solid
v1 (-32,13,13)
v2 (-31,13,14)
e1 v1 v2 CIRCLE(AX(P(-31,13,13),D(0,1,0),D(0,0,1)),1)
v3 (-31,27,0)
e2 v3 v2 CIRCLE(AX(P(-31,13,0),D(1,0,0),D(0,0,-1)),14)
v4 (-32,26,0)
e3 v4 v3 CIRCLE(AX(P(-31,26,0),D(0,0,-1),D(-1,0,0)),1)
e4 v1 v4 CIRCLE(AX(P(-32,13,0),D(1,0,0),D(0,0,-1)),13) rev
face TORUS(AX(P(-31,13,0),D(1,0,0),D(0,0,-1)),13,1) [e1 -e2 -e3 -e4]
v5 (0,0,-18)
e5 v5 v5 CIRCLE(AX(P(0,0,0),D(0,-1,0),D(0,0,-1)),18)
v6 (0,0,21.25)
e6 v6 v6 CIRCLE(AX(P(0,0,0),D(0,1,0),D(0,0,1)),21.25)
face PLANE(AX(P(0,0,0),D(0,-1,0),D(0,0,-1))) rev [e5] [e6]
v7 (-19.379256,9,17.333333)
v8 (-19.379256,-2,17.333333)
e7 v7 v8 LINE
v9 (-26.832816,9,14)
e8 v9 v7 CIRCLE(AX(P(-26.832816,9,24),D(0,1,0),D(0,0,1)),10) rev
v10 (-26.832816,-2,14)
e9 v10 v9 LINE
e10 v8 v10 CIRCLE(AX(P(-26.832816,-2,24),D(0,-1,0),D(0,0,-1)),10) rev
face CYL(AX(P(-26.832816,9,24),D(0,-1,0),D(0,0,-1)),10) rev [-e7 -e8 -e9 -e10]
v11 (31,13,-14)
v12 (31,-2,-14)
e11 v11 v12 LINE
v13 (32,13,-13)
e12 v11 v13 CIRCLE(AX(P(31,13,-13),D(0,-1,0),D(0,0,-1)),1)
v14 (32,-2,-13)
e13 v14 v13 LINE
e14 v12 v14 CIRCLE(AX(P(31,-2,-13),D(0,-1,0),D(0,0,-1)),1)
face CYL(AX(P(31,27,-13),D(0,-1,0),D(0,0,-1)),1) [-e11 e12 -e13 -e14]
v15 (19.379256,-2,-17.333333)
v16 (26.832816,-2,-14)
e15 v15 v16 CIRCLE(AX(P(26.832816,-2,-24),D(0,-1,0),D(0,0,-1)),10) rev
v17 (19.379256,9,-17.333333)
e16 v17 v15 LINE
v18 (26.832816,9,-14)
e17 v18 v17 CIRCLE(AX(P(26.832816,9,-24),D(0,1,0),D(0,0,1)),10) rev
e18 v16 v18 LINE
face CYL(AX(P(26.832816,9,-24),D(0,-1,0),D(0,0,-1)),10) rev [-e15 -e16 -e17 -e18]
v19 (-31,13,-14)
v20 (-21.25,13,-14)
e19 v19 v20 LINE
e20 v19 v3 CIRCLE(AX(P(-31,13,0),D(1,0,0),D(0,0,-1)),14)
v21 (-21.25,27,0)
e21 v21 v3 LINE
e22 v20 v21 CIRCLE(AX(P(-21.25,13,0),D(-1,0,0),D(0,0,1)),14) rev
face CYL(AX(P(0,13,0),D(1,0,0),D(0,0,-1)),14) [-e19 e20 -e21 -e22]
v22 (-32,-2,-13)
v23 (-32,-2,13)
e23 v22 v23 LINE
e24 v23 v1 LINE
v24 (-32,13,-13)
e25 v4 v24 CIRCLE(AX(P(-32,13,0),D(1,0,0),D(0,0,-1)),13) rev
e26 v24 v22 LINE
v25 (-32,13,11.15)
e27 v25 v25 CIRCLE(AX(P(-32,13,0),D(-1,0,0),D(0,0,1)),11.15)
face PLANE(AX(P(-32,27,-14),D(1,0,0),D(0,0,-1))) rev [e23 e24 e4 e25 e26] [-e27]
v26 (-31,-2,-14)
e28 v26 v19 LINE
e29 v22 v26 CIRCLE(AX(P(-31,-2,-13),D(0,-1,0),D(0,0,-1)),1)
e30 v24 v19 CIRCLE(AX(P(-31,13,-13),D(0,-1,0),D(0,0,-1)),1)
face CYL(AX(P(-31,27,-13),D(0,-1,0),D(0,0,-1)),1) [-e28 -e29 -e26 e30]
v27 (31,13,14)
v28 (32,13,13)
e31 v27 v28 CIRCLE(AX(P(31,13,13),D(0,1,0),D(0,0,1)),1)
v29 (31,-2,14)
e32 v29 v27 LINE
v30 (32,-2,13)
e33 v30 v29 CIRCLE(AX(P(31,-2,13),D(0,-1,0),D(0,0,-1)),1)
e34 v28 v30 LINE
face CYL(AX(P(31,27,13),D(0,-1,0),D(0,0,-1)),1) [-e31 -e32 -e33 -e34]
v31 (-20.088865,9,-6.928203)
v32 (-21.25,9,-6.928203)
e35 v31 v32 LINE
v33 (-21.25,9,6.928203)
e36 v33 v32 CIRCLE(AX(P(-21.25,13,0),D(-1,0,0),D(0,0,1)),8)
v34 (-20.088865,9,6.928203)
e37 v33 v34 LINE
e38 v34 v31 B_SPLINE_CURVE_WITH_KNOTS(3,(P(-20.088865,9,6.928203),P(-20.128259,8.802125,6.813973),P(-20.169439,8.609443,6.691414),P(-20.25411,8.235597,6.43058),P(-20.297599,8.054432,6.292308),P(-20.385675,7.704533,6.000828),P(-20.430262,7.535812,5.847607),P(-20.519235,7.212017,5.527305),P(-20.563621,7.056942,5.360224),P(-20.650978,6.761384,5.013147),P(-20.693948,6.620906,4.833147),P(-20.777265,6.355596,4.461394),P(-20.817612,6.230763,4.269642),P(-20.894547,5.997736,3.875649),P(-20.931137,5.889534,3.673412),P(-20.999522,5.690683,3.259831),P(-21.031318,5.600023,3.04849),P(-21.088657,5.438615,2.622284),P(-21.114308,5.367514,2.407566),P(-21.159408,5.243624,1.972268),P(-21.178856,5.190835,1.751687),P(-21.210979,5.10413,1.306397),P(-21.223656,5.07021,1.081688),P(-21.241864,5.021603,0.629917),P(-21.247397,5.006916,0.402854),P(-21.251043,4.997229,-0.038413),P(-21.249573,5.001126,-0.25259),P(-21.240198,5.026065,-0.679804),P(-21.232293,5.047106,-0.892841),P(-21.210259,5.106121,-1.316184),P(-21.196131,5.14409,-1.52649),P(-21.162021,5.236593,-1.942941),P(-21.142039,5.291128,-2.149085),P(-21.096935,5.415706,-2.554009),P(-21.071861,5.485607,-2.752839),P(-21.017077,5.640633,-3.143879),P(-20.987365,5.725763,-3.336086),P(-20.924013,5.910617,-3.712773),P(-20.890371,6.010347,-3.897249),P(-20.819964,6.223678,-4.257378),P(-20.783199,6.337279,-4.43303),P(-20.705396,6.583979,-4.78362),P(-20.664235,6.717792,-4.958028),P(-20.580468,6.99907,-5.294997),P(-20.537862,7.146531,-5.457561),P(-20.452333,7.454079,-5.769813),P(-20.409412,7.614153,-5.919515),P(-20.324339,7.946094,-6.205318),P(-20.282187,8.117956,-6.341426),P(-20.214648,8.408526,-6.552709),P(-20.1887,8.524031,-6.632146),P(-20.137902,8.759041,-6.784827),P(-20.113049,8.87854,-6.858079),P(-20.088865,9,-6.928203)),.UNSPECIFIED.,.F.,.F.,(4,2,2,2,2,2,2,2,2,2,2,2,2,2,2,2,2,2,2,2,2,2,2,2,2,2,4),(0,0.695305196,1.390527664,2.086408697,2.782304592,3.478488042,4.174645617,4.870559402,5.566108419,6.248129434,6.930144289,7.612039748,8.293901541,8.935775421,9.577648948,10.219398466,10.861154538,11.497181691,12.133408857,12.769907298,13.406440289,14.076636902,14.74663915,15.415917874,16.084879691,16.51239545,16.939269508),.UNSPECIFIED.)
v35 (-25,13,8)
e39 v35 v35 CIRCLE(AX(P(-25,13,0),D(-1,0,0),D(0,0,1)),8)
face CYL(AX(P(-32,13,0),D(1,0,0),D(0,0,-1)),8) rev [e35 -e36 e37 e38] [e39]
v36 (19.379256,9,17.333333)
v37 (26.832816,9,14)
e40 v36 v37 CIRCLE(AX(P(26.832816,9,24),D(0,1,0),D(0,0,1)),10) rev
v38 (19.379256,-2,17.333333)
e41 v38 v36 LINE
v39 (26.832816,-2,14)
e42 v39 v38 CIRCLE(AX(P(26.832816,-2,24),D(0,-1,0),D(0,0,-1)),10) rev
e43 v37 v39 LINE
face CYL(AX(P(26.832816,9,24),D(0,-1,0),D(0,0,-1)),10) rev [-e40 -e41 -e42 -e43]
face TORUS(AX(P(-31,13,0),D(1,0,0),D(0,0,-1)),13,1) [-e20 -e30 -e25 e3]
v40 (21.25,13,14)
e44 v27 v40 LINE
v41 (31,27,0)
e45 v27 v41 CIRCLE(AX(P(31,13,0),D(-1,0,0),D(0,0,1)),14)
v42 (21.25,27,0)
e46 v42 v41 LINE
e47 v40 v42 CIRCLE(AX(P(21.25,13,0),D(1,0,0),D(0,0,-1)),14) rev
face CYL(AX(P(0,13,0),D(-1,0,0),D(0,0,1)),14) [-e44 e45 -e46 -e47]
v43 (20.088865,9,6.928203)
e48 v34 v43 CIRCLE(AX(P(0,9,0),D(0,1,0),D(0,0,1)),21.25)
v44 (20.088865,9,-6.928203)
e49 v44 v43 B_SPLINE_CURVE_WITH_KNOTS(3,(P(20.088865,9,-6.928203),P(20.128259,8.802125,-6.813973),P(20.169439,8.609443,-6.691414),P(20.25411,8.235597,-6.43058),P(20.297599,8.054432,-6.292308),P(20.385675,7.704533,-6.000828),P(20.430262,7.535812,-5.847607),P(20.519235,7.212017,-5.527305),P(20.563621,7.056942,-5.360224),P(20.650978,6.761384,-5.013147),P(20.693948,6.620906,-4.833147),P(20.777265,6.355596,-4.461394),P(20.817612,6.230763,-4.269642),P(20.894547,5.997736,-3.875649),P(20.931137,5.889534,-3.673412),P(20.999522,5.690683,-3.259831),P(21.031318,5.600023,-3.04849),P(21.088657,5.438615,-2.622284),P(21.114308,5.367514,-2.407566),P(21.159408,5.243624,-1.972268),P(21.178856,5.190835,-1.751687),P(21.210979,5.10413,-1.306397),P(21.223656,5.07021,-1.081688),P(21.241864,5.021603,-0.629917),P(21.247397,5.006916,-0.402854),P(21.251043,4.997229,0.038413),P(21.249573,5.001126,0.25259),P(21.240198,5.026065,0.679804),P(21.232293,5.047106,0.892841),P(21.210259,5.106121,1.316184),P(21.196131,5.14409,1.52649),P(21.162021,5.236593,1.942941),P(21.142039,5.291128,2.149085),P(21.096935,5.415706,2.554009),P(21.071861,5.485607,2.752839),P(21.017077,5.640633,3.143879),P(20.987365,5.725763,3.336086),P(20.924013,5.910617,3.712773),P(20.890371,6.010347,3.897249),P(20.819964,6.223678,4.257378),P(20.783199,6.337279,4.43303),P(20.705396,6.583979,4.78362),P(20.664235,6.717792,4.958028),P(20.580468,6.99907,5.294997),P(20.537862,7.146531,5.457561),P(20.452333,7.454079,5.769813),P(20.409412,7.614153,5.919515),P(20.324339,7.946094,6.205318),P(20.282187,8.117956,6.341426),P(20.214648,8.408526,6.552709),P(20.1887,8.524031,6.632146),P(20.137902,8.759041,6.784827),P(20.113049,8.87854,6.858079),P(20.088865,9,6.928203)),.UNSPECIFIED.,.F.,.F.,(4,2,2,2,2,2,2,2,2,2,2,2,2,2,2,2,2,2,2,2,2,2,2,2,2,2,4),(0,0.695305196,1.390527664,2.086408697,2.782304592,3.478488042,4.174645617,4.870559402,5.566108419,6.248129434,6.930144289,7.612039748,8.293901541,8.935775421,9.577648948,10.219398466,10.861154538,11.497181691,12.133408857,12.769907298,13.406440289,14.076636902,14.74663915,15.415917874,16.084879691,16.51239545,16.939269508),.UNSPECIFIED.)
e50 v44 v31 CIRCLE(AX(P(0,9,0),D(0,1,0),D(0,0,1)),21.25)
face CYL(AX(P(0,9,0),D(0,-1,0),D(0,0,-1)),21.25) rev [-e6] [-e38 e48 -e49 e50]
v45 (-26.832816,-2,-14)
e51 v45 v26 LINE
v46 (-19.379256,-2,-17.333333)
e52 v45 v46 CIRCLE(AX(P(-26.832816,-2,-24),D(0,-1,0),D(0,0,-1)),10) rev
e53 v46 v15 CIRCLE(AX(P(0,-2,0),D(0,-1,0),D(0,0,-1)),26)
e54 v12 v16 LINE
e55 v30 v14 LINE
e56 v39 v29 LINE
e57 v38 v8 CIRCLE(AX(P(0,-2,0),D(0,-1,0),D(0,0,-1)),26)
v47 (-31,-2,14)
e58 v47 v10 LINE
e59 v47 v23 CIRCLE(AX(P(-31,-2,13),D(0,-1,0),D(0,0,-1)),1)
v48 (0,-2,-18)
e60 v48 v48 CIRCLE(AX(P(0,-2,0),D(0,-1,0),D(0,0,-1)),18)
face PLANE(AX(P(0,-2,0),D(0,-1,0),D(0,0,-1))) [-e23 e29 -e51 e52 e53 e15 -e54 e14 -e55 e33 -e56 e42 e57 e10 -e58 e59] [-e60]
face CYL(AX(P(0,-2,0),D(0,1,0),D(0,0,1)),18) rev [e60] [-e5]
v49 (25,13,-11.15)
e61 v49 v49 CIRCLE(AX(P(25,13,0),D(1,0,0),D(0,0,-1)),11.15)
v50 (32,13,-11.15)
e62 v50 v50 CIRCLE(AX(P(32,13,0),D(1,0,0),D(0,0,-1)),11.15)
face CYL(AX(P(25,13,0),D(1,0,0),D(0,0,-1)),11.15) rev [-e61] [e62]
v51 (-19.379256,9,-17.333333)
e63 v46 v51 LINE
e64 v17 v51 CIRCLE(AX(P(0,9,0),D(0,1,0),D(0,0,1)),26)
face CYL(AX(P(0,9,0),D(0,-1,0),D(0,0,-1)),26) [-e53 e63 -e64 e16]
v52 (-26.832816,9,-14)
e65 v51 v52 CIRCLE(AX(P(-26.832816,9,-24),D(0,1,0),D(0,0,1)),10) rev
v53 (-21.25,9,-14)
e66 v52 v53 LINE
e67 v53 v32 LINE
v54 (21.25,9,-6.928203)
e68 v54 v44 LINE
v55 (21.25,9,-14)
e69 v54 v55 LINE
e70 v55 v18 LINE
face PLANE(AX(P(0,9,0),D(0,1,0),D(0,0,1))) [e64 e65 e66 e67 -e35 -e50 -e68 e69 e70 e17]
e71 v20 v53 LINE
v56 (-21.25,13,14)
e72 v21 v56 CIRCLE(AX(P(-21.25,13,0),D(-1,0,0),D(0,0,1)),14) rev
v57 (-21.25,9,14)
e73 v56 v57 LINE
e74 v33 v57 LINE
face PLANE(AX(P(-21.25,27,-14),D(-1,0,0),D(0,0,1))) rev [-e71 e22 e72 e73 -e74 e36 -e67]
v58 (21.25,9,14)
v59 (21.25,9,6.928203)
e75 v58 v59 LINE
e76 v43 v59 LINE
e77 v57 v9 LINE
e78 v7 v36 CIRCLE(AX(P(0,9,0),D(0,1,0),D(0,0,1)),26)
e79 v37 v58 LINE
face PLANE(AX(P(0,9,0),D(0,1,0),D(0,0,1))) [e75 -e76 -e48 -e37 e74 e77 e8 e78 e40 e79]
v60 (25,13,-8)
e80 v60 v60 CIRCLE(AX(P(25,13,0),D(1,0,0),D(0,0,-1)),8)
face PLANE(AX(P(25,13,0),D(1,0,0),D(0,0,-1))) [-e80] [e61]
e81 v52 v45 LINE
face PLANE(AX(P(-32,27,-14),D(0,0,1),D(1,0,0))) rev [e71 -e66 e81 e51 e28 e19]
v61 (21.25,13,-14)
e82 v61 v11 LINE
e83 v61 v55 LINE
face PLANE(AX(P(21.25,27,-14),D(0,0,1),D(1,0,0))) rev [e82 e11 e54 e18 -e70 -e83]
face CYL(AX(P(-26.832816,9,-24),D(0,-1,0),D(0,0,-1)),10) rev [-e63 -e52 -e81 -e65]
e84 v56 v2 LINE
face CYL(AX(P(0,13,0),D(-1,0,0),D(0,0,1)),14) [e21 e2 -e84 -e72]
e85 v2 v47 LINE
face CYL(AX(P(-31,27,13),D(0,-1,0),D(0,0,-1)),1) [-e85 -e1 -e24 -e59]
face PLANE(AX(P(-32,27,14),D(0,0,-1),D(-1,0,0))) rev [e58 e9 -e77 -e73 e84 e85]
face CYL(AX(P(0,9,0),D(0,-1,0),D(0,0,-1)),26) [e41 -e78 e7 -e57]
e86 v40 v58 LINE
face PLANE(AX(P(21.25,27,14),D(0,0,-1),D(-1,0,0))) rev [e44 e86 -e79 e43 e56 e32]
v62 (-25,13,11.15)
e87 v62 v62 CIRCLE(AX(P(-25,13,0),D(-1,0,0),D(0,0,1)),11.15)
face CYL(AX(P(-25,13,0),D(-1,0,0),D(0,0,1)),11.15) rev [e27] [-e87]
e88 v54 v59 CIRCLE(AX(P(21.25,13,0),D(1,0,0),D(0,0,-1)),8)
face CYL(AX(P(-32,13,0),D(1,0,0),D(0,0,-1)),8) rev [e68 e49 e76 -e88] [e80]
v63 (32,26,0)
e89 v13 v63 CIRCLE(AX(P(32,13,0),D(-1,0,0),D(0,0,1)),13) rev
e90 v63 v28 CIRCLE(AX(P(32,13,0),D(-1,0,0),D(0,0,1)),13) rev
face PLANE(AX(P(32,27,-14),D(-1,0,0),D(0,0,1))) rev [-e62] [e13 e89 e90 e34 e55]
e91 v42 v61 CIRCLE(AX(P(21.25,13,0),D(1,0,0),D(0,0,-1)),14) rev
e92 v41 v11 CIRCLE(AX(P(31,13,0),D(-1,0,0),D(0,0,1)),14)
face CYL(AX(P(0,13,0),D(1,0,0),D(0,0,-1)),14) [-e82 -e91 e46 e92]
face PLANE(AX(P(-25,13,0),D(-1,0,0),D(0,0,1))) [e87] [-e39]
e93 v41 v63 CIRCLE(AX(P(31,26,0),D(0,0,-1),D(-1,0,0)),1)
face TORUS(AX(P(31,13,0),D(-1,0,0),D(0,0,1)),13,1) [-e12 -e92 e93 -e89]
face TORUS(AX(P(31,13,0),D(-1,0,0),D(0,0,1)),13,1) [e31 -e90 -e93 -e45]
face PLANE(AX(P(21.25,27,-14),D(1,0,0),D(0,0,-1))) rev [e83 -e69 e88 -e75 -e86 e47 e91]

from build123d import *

# Parameters (mm, degrees)
SKETCH1_R                       = 26
SKETCH1_R_2                     = 21.25
BOSS_EXTRUDE1_DEPTH             = 9
BOSS_EXTRUDE2_START             = 2
SKETCH2_R                       = 26
SKETCH2_R_2                     = 18
BOSS_EXTRUDE2_DEPTH             = 2
BOSS_EXTRUDE3_REACH             = 40.38
SKETCH3_W                       = 10.75
SKETCH3_H                       = 28
BOSS_EXTRUDE3_DIRECTION_2_DEPTH = 18
SKETCH4_R                       = 11.15
CUT_EXTRUDE1_DEPTH              = 7
CUT_EXTRUDE2_START              = -7
SKETCH5_R                       = 11.15
CUT_EXTRUDE2_DEPTH              = 7
SKETCH6_R                       = 8
CUT_EXTRUDE3_DEPTH              = 69.220231603
FILLET2_R                       = 14
FILLET3_R                       = 10
FILLET4_R                       = 1


with BuildPart() as part:
    # Sketch1 → Boss-Extrude1 (new body)
    with BuildSketch(Plane(origin=(0, 0, 0), x_dir=(1, 0, 0), z_dir=(0, 1, 0))):
        with Locations(Location((0, 0, 0), (0, 0, 270))):
            Circle(SKETCH1_R)
        with Locations(Location((0, 0, 0), (0, 0, 270))):
            Circle(SKETCH1_R_2, mode=Mode.SUBTRACT)
    extrude(amount=BOSS_EXTRUDE1_DEPTH)

    # Sketch2 → Boss-Extrude2 (add)
    with BuildSketch(Plane.XZ.offset(BOSS_EXTRUDE2_START)):
        with Locations(Location((0, 0, 0), (0, 0, 270))):
            Circle(SKETCH2_R)
        with Locations(Location((0, 0, 0), (0, 0, 270))):
            Circle(SKETCH2_R_2, mode=Mode.SUBTRACT)
    extrude(amount=-BOSS_EXTRUDE2_DEPTH)

    # Boss-Extrude3: up to this face of the body (flat: up to its plane)
    boss_extrude3_end = Plane(part.part.faces().sort_by_distance((0, -2, 25.264608948))[0])
    # Sketch3 → Boss-Extrude3 (add, up to the picked face)
    with BuildSketch(Plane(origin=(0, 9, 0), x_dir=(1, 0, 0), z_dir=(0, 1, 0)), mode=Mode.PRIVATE) as boss_extrude3_sk1:
        with Locations((26.625, 0)):
            Rectangle(SKETCH3_W, SKETCH3_H)
    boss_extrude3_tool1 = split(extrude(boss_extrude3_sk1.sketch, amount=-BOSS_EXTRUDE3_REACH, mode=Mode.PRIVATE), bisect_by=boss_extrude3_end, keep=Keep.BOTH, mode=Mode.PRIVATE)
    # Sketch3 → Boss-Extrude3 (add, up to the picked face)
    with BuildSketch(Plane(origin=(0, 9, 0), x_dir=(1, 0, 0), z_dir=(0, 1, 0)), mode=Mode.PRIVATE) as boss_extrude3_sk2:
        with Locations((-26.625, 0)):
            Rectangle(SKETCH3_W, SKETCH3_H)
    boss_extrude3_tool2 = split(extrude(boss_extrude3_sk2.sketch, amount=-BOSS_EXTRUDE3_REACH, mode=Mode.PRIVATE), bisect_by=boss_extrude3_end, keep=Keep.BOTH, mode=Mode.PRIVATE)
    add(boss_extrude3_tool1.solids().sort_by(Axis((26.625, 9, 0), (0, -1, 0)))[0])
    add(boss_extrude3_tool2.solids().sort_by(Axis((-26.625, 9, 0), (0, -1, 0)))[0])

    # Sketch3 → Boss-Extrude3 direction 2 (add)
    with BuildSketch(Plane(origin=(0, 9, 0), x_dir=(1, 0, 0), z_dir=(0, 1, 0))):
        with Locations((26.625, 0)):
            Rectangle(SKETCH3_W, SKETCH3_H)
        with Locations((-26.625, 0)):
            Rectangle(SKETCH3_W, SKETCH3_H)
    extrude(amount=BOSS_EXTRUDE3_DIRECTION_2_DEPTH)

    # Sketch4 → Cut-Extrude1 (cut)
    with BuildSketch(Plane(origin=(32, 0, 0), x_dir=(0, 0, -1), z_dir=(1, 0, 0))):
        with Locations((0, 13)):
            Circle(SKETCH4_R)
    extrude(amount=-CUT_EXTRUDE1_DEPTH, mode=Mode.SUBTRACT)

    # Sketch5 → Cut-Extrude2 (cut)
    with BuildSketch(Plane.ZY.offset(32).offset(CUT_EXTRUDE2_START)):
        with Locations(Location((0, 13, 0), (0, 0, 180))):
            Circle(SKETCH5_R)
    extrude(amount=CUT_EXTRUDE2_DEPTH, mode=Mode.SUBTRACT)

    # Sketch6 → Cut-Extrude3 (cut, through all)
    with BuildSketch(Plane(origin=(25, 0, 0), x_dir=(0, 0, -1), z_dir=(1, 0, 0))):
        with Locations(Location((0, 13, 0), (0, 0, 330))):
            Circle(SKETCH6_R)
    extrude(amount=-CUT_EXTRUDE3_DEPTH, mode=Mode.SUBTRACT)

    # Fillet2
    fillet2_edges = [part.edges().sort_by_distance(p)[0] for p in [
        (-26.625, 27, 14),
        (-26.625, 27, -14),
        (26.625, 27, -14),
        (26.625, 27, 14),
    ]]
    fillet(fillet2_edges, radius=FILLET2_R - 0.0001)  # a hair under: the kernel refuses the full size

    # Fillet3
    fillet3_edges = [part.edges().sort_by_distance(p)[0] for p in [
        (-21.9089023, 3.5, -14),
        (-21.9089023, 3.5, 14),
        (21.9089023, 3.5, -14),
        (21.9089023, 3.5, 14),
    ]]
    fillet(fillet3_edges, radius=FILLET3_R)

    # Fillet4
    fillet4_edges = [part.edges().sort_by_distance(p)[0] for p in [
        (-32, 5.50005, 14),
        (-32, 5.50005, -14),
        (-32, 22.899524226, -9.899524226),
        (-32, 22.899524226, 9.899524226),
        (32, 5.50005, -14),
        (32, 5.50005, 14),
        (32, 22.899524226, 9.899524226),
        (32, 22.899524226, -9.899524226),
    ]]
    fillet(fillet4_edges, radius=FILLET4_R)


solid = part.part
